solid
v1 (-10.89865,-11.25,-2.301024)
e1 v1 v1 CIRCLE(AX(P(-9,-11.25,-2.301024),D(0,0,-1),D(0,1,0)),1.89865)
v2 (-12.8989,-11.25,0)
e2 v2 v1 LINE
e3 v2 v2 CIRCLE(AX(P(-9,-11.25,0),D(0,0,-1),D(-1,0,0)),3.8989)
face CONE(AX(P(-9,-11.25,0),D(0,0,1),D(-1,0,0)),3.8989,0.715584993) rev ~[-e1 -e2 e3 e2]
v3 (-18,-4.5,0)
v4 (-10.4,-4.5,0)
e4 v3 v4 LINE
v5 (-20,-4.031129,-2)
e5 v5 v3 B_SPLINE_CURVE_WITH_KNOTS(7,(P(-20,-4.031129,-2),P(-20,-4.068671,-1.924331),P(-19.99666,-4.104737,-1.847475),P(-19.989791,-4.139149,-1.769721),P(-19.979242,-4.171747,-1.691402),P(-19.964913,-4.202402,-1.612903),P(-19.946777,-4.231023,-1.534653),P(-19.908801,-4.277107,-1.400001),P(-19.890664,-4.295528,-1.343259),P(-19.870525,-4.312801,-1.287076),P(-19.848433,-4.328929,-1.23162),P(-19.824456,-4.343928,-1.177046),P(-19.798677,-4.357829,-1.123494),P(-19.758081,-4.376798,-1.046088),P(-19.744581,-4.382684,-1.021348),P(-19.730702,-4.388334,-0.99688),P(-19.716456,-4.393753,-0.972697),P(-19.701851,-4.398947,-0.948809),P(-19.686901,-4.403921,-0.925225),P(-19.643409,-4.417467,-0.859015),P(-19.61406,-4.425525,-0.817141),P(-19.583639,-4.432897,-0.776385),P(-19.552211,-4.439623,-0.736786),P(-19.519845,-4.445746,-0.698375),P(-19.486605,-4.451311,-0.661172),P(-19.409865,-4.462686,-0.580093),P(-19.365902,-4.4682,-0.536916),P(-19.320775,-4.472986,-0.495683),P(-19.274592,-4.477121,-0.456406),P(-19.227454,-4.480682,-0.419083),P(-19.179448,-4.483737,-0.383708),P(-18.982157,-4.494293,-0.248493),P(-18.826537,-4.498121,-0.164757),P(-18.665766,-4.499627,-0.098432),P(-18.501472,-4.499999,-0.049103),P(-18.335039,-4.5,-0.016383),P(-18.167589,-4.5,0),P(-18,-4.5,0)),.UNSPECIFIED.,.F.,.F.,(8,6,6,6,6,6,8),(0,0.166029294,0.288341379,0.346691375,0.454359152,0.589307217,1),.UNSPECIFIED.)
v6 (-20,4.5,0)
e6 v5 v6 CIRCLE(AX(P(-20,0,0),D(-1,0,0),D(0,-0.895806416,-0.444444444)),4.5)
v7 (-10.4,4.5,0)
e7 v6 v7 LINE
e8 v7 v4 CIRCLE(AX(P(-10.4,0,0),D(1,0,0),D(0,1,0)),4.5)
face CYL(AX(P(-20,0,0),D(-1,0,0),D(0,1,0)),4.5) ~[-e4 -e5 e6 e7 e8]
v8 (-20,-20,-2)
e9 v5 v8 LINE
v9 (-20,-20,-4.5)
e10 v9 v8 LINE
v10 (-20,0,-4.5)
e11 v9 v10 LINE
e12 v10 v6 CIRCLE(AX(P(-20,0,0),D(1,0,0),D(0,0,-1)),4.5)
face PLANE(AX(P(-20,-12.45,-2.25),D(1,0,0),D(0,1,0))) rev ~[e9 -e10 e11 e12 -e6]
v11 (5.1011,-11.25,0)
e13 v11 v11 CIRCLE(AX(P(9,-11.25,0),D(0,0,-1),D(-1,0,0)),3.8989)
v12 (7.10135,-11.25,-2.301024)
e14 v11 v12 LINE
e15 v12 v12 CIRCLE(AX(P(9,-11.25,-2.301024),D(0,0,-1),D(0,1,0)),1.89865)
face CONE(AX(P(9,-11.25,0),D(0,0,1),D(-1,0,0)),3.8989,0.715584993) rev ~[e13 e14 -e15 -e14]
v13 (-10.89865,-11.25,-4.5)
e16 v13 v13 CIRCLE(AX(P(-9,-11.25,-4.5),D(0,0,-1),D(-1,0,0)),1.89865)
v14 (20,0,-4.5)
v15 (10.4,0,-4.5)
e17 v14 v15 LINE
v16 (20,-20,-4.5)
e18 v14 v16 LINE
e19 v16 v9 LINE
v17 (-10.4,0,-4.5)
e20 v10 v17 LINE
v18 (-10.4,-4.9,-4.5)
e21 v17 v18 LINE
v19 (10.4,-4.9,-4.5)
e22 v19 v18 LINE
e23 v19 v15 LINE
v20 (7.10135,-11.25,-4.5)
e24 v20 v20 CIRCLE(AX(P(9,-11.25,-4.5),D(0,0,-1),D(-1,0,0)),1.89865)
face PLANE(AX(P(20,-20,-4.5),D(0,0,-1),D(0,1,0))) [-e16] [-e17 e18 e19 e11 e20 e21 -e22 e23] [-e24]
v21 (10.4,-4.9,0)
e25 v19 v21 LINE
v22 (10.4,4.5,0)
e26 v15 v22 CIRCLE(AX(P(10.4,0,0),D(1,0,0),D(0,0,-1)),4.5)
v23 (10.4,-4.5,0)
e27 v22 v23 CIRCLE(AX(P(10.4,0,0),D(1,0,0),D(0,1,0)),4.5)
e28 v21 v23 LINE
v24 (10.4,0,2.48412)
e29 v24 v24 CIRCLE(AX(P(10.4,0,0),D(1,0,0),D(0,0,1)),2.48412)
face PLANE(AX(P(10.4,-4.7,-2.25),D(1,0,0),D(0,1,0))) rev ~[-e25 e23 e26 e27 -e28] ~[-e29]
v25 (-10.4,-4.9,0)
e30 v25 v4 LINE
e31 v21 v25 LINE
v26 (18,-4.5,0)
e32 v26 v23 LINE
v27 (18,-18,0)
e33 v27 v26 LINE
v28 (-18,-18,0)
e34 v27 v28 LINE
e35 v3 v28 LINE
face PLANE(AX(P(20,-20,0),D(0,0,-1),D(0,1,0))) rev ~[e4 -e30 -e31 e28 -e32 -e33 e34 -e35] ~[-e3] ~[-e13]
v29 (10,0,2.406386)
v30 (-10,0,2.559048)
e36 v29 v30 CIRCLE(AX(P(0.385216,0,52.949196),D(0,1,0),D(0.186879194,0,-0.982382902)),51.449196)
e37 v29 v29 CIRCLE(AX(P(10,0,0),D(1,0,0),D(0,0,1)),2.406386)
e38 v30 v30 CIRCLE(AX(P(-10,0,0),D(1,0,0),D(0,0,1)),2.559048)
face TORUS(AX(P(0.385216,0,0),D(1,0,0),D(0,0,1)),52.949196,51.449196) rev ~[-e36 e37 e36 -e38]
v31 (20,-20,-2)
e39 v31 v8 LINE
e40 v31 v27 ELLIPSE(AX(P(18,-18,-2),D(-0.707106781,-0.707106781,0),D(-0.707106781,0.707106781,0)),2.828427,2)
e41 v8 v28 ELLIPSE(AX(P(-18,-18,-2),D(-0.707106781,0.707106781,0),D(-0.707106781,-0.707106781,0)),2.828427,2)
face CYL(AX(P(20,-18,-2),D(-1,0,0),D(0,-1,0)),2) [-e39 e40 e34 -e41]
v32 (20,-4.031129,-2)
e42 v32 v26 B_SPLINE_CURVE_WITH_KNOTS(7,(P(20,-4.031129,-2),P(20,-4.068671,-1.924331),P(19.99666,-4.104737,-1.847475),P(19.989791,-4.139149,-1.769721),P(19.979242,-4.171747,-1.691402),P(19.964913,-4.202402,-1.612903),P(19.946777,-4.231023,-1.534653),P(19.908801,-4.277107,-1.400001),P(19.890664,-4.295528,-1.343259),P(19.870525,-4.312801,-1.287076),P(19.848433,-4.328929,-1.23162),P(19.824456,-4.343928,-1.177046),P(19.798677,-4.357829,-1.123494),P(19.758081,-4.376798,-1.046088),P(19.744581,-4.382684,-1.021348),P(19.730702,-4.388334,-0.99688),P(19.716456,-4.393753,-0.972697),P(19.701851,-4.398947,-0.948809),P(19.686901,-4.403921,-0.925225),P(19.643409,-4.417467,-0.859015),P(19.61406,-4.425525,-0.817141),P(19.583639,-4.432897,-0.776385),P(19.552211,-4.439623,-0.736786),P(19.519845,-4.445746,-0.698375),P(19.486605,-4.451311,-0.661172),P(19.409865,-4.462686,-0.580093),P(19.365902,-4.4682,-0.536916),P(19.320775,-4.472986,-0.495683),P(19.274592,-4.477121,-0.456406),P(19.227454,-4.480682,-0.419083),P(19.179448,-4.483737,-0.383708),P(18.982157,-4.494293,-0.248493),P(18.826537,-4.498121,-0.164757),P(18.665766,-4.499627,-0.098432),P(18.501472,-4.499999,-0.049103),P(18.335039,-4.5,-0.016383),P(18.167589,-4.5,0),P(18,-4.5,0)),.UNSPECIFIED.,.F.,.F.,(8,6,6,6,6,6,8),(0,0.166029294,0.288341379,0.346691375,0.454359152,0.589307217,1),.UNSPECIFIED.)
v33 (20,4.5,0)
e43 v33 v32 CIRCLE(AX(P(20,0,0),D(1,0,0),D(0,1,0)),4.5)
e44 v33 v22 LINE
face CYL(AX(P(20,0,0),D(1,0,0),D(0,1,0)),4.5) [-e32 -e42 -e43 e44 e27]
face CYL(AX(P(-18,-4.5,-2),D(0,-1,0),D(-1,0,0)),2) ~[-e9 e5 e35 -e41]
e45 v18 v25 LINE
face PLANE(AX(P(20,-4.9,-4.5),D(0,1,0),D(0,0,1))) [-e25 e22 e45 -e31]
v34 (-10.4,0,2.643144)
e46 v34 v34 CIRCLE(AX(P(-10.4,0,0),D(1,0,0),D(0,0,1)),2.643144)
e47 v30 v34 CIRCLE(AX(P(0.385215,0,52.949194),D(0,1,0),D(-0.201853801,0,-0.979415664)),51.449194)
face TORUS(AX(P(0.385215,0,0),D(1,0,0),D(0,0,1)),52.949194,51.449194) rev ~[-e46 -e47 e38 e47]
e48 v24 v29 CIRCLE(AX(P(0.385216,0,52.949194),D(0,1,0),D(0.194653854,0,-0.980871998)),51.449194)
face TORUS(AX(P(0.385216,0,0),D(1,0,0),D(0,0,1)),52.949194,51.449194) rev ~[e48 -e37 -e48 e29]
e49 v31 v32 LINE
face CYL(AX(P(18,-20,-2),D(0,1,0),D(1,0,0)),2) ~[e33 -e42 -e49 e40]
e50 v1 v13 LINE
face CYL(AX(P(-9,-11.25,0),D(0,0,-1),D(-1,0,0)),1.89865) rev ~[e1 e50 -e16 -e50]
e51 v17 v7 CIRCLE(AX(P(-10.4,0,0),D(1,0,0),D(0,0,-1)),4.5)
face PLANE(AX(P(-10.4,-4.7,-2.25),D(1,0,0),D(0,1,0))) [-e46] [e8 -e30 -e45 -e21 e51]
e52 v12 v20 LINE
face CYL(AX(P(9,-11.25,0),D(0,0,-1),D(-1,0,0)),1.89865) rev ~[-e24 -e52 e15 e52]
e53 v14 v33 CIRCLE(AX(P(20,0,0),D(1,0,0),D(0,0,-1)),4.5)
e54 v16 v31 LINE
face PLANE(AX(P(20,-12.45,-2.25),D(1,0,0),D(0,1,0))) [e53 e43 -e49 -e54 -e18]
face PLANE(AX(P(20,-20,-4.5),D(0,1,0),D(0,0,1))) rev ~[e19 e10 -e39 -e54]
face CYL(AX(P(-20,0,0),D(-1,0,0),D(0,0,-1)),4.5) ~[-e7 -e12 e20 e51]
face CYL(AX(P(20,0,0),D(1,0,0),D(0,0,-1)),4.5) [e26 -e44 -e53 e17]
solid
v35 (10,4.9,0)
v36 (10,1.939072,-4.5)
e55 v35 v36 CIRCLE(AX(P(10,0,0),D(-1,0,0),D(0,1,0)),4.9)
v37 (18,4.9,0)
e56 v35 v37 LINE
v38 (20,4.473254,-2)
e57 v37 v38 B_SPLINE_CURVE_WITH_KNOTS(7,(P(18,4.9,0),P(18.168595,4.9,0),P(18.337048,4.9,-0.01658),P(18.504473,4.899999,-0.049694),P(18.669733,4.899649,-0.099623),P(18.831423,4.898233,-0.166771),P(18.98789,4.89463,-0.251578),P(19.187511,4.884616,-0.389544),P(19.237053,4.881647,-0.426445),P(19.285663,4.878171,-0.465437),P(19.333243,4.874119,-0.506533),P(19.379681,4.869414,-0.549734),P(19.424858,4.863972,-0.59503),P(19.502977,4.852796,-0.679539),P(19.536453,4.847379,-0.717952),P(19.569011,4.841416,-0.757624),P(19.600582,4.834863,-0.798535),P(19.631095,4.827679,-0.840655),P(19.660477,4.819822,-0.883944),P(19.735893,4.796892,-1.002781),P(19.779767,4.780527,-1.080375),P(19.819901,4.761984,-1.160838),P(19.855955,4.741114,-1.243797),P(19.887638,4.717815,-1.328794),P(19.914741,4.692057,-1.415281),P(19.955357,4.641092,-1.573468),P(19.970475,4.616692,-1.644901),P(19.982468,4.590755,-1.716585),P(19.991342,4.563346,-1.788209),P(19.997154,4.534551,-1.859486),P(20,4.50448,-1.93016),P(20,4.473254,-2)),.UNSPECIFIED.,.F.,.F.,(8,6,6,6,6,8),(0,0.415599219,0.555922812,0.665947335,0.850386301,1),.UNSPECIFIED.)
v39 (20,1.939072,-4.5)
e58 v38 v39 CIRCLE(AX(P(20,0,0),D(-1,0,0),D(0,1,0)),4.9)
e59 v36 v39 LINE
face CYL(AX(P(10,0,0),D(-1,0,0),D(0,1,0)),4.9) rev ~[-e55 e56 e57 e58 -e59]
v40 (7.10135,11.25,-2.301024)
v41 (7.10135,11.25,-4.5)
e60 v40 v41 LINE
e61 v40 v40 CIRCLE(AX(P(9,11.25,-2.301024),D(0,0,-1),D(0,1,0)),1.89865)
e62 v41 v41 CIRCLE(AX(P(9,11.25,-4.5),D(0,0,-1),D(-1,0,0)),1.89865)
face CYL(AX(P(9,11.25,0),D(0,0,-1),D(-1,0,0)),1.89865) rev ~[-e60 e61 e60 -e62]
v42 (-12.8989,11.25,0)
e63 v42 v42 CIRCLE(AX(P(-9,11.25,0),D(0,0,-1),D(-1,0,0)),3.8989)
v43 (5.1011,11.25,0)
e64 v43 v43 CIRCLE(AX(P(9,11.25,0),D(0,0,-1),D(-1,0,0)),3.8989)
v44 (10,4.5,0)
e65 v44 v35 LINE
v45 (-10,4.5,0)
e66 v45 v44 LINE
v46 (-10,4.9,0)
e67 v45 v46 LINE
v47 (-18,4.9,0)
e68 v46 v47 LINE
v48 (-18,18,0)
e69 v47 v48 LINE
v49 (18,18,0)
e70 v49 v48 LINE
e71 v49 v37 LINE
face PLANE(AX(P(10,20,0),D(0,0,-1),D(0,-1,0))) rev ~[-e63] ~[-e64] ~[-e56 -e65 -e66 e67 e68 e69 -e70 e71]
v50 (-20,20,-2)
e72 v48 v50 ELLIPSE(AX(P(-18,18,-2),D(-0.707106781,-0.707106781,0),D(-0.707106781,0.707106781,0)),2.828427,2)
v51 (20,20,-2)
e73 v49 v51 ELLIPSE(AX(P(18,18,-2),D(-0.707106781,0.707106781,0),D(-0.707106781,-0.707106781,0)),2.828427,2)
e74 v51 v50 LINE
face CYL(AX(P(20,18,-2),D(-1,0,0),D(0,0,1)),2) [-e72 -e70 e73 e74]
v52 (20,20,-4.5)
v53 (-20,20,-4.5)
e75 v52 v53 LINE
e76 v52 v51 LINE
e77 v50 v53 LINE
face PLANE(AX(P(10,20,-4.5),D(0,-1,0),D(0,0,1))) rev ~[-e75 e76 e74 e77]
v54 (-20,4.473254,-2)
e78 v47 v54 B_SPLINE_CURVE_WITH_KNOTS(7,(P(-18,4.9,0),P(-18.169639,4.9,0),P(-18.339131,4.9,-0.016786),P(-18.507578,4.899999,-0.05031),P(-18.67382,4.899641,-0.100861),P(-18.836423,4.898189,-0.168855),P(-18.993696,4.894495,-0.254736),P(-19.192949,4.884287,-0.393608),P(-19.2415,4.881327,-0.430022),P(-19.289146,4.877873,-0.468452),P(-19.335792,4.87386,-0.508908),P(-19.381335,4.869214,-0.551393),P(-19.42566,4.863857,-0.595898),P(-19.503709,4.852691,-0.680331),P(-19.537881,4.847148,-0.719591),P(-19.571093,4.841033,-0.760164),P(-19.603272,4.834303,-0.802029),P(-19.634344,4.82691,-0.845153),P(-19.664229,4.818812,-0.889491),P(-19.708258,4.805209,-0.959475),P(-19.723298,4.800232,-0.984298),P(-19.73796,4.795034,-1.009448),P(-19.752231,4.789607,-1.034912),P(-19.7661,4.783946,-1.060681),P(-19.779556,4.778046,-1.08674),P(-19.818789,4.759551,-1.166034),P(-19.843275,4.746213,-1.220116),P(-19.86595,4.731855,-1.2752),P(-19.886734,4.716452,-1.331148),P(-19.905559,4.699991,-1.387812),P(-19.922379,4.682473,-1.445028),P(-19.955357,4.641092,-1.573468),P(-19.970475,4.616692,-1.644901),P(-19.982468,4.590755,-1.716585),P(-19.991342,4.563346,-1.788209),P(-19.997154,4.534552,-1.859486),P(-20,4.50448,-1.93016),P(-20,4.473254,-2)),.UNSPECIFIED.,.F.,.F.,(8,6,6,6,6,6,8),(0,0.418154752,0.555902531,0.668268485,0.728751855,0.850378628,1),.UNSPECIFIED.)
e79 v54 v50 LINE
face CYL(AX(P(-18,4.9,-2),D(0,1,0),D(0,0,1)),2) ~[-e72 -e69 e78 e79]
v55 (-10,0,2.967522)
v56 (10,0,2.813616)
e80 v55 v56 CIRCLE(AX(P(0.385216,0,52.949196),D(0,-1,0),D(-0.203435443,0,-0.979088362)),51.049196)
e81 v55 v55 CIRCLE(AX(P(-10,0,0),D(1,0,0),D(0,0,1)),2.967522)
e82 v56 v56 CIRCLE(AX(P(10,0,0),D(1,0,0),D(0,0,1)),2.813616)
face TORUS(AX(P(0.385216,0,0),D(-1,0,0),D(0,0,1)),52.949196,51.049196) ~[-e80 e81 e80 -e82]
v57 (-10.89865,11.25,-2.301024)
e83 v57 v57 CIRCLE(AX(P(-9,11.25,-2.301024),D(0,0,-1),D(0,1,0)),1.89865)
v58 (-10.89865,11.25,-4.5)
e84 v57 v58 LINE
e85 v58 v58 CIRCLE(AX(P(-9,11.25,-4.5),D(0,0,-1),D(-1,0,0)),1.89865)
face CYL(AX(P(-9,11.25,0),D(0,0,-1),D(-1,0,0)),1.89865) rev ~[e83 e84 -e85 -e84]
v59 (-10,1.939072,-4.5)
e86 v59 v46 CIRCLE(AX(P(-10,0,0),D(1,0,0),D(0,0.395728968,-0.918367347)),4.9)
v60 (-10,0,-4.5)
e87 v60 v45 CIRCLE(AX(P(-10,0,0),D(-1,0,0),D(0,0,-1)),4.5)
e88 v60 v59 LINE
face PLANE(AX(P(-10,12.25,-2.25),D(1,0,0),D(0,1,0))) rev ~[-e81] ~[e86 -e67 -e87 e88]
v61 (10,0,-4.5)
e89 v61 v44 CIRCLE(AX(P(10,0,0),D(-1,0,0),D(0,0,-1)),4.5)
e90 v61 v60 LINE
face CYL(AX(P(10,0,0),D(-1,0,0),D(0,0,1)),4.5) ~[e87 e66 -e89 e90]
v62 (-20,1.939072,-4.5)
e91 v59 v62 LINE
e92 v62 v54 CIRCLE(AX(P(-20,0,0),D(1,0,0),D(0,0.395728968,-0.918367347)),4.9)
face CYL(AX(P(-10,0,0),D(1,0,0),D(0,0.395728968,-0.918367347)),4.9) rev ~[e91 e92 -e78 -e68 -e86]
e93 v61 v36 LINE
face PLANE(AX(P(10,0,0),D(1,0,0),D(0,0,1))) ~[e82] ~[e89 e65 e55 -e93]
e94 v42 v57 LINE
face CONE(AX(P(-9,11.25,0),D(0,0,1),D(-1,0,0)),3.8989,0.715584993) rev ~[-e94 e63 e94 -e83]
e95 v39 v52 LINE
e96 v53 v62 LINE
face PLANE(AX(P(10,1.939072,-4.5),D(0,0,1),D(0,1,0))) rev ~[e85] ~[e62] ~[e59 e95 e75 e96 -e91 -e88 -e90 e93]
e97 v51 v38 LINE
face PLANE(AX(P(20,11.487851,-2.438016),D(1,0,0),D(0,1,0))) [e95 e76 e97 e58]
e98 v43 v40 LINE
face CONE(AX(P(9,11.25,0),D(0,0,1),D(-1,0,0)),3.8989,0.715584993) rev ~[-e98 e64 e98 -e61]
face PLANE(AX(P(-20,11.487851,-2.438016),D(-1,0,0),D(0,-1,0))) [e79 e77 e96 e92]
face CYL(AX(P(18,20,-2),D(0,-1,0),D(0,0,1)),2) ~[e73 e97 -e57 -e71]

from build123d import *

# Parameters (mm, degrees)
F5_W              = 15.5
F5_H              = 4.5
F8_DEPTH          = 10
F8_DEPTH_BACK     = 10
F9_W              = 0.4
F9_H              = 4.5
F10_DEPTH         = 9.6
F12_DEPTH         = 9.6
F13_DEPTH         = 9.6
F11_W             = 0.4
F11_H             = 4.5
F14_DEPTH         = 9.6
F9_W_2            = 15.1
F15_DEPTH         = 40
F17_DEPTH         = 10
F19_DEPTH         = 10
F20_R             = 2
F20_2_R           = 2
F22_D             = 3.7973
F22_CSINK_D       = 7.7978
F22_CSINK_ANGLE   = 82
F22_2_D           = 3.7973
F22_2_CSINK_D     = 7.7978
F22_2_CSINK_ANGLE = 82


with BuildPart() as f3:
    # F2 (on Front) → F3 (revolve)
    with BuildSketch(Plane.XZ):
        with BuildLine():
            Line((-10, 2.5590475353), (-10, 0))
            Line((-10, 0), (10, 0))
            Line((10, 0), (10, 2.4063855079))
            ThreePointArc((10, 2.4063855079), (-0.0074897347, 1.5014987586), (-10, 2.5590475353))
        make_face()
        with BuildLine():
            Line((-10.4, 0), (-10, 0))
            Line((-10, 0), (-10, 2.5590475353))
            ThreePointArc((-10, 2.5590475353), (-10.2000835145, 2.6006984263), (-10.4, 2.6431437831))
            Line((-10.4, 2.6431437831), (-10.4, 0))
        make_face()
        with BuildLine():
            Line((10, 2.4063855079), (10, 0))
            Line((10, 0), (10.4, 0))
            Line((10.4, 0), (10.4, 2.484120304))
            ThreePointArc((10.4, 2.484120304), (10.2000769588, 2.4448568988), (10, 2.4063855079))
        make_face()
    revolve(axis=Axis((0, 0, 0), (1, 0, 0)))

    # F9 (on offset) → F10 (join, through all)
    with BuildSketch(Plane.YZ.offset(20)):
        with Locations((-4.7, -2.25)):
            Rectangle(F9_W, F9_H)
        with BuildLine():
            ThreePointArc((4.5, 0), (0, 4.5), (-4.5, 0))
            Line((-4.5, 0), (4.5, 0))
        make_face()
        with BuildLine():
            ThreePointArc((0, -4.5), (-3.1819805153, -3.1819805153), (-4.5, 0))
            Line((-4.5, 0), (-4.5, -4.5))
            Line((-4.5, -4.5), (0, -4.5))
        make_face()
        with BuildLine():
            Line((4.5, 0), (-4.5, 0))
            ThreePointArc((-4.5, 0), (-3.1819805153, -3.1819805153), (0, -4.5))
            ThreePointArc((0, -4.5), (3.1819805153, -3.1819805153), (4.5, 0))
        make_face()
    extrude(amount=-F10_DEPTH)

    # F11 (on offset) → F12 (join, through all)
    with BuildSketch(Plane.YZ.offset(-20)):
        with BuildLine():
            ThreePointArc((0, -4.5), (3.1819805153, -3.1819805153), (4.5, 0))
            Line((4.5, 0), (-4.5, 0))
            ThreePointArc((-4.5, 0), (-3.1819805153, -3.1819805153), (0, -4.5))
        make_face()
        with BuildLine():
            Line((-4.5, 0), (4.5, 0))
            ThreePointArc((4.5, 0), (0, 4.5), (-4.5, 0))
        make_face()
        with BuildLine():
            ThreePointArc((0, -4.5), (-3.1819805153, -3.1819805153), (-4.5, 0))
            Line((-4.5, 0), (-4.5, -4.5))
            Line((-4.5, -4.5), (0, -4.5))
        make_face()
    extrude(amount=F12_DEPTH)

    # F9 (on offset) → F13 (join)
    with BuildSketch(Plane.YZ.offset(20)):
        with Locations((-4.7, -2.25)):
            Rectangle(F9_W, F9_H)
    extrude(amount=-F13_DEPTH)

    # F11 (on offset) → F14 (join)
    with BuildSketch(Plane.YZ.offset(-20)):
        with Locations((-4.7, -2.25)):
            Rectangle(F11_W, F11_H)
    extrude(amount=F14_DEPTH)

    # F9 (on offset) → F15 (join, through all)
    with BuildSketch(Plane.YZ.offset(20)):
        with Locations((-12.45, -2.25)):
            Rectangle(F9_W_2, F9_H)
    extrude(amount=-F15_DEPTH)

    # F20
    f20_edges = [f3.edges().sort_by_distance(p)[0] for p in [
        (20, -12.25, 0),
        (0, -20, 0),
        (-20, -12.25, 0),
    ]]
    fillet(f20_edges, radius=F20_R)

    # F22 (through all)
    with Locations(Plane.XY):
        with Locations((9, 11.25), (-9, 11.25), (-9, -11.25), (9, -11.25)):
            CounterSinkHole(F22_D / 2, F22_CSINK_D / 2, counter_sink_angle=F22_CSINK_ANGLE)


with BuildPart() as f4:
    # F2 (on Front) → F4 (revolve)
    with BuildSketch(Plane.XZ):
        with BuildLine():
            Line((-10, 4.5), (-10, 2.9675223036))
            ThreePointArc((-10, 2.9675223036), (-0.0076110898, 1.9015114363), (10, 2.8136164617))
            Line((10, 2.8136164617), (10, 4.5))
            Line((10, 4.5), (-10, 4.5))
        make_face()
    revolve(axis=Axis((0, 0, 0), (1, 0, 0)))

    # F5 (on Right) → F8 (join, two sides)
    with BuildSketch(Plane.YZ) as f8_sk:
        with Locations((12.25, -2.25)):
            Rectangle(F5_W, F5_H)
        with BuildLine():
            Line((4.5, -4.5), (4.5, 0))
            ThreePointArc((4.5, 0), (3.1819805153, -3.1819805153), (0, -4.5))
            Line((0, -4.5), (4.5, -4.5))
        make_face()
    extrude(amount=F8_DEPTH)
    extrude(f8_sk.sketch, amount=-F8_DEPTH_BACK)

    # F16 (on face) → F17 (join, through all)
    with BuildSketch(Plane(origin=(-10, 0, 0), x_dir=(0, -1, 0), z_dir=(-1, 0, 0))):
        with BuildLine():
            ThreePointArc((-1.939071943, -4.5), (-4.0933759002, -2.6933759002), (-4.9, 0))
            Line((-4.9, 0), (-20, 0))
            Line((-20, 0), (-20, -4.5))
            Line((-20, -4.5), (-1.939071943, -4.5))
        make_face()
    extrude(amount=F17_DEPTH)

    # F18 (on face) → F19 (join, through all)
    with BuildSketch(Plane.YZ.offset(10)):
        with BuildLine():
            Line((20, 0), (4.9, 0))
            ThreePointArc((4.9, 0), (4.0933759002, -2.6933759002), (1.939071943, -4.5))
            Line((1.939071943, -4.5), (20, -4.5))
            Line((20, -4.5), (20, 0))
        make_face()
    extrude(amount=F19_DEPTH)

    # F20#2
    f20_2_edges = [f4.edges().sort_by_distance(p)[0] for p in [
        (20, 12.45, 0),
        (0, 20, 0),
        (-20, 12.45, 0),
    ]]
    fillet(f20_2_edges, radius=F20_2_R)

    # F22#2 (through all)
    with Locations(Plane.XY):
        with Locations((9, 11.25), (-9, 11.25), (-9, -11.25), (9, -11.25)):
            CounterSinkHole(F22_2_D / 2, F22_2_CSINK_D / 2, counter_sink_angle=F22_2_CSINK_ANGLE)


solid = Compound([f3.part, f4.part])
